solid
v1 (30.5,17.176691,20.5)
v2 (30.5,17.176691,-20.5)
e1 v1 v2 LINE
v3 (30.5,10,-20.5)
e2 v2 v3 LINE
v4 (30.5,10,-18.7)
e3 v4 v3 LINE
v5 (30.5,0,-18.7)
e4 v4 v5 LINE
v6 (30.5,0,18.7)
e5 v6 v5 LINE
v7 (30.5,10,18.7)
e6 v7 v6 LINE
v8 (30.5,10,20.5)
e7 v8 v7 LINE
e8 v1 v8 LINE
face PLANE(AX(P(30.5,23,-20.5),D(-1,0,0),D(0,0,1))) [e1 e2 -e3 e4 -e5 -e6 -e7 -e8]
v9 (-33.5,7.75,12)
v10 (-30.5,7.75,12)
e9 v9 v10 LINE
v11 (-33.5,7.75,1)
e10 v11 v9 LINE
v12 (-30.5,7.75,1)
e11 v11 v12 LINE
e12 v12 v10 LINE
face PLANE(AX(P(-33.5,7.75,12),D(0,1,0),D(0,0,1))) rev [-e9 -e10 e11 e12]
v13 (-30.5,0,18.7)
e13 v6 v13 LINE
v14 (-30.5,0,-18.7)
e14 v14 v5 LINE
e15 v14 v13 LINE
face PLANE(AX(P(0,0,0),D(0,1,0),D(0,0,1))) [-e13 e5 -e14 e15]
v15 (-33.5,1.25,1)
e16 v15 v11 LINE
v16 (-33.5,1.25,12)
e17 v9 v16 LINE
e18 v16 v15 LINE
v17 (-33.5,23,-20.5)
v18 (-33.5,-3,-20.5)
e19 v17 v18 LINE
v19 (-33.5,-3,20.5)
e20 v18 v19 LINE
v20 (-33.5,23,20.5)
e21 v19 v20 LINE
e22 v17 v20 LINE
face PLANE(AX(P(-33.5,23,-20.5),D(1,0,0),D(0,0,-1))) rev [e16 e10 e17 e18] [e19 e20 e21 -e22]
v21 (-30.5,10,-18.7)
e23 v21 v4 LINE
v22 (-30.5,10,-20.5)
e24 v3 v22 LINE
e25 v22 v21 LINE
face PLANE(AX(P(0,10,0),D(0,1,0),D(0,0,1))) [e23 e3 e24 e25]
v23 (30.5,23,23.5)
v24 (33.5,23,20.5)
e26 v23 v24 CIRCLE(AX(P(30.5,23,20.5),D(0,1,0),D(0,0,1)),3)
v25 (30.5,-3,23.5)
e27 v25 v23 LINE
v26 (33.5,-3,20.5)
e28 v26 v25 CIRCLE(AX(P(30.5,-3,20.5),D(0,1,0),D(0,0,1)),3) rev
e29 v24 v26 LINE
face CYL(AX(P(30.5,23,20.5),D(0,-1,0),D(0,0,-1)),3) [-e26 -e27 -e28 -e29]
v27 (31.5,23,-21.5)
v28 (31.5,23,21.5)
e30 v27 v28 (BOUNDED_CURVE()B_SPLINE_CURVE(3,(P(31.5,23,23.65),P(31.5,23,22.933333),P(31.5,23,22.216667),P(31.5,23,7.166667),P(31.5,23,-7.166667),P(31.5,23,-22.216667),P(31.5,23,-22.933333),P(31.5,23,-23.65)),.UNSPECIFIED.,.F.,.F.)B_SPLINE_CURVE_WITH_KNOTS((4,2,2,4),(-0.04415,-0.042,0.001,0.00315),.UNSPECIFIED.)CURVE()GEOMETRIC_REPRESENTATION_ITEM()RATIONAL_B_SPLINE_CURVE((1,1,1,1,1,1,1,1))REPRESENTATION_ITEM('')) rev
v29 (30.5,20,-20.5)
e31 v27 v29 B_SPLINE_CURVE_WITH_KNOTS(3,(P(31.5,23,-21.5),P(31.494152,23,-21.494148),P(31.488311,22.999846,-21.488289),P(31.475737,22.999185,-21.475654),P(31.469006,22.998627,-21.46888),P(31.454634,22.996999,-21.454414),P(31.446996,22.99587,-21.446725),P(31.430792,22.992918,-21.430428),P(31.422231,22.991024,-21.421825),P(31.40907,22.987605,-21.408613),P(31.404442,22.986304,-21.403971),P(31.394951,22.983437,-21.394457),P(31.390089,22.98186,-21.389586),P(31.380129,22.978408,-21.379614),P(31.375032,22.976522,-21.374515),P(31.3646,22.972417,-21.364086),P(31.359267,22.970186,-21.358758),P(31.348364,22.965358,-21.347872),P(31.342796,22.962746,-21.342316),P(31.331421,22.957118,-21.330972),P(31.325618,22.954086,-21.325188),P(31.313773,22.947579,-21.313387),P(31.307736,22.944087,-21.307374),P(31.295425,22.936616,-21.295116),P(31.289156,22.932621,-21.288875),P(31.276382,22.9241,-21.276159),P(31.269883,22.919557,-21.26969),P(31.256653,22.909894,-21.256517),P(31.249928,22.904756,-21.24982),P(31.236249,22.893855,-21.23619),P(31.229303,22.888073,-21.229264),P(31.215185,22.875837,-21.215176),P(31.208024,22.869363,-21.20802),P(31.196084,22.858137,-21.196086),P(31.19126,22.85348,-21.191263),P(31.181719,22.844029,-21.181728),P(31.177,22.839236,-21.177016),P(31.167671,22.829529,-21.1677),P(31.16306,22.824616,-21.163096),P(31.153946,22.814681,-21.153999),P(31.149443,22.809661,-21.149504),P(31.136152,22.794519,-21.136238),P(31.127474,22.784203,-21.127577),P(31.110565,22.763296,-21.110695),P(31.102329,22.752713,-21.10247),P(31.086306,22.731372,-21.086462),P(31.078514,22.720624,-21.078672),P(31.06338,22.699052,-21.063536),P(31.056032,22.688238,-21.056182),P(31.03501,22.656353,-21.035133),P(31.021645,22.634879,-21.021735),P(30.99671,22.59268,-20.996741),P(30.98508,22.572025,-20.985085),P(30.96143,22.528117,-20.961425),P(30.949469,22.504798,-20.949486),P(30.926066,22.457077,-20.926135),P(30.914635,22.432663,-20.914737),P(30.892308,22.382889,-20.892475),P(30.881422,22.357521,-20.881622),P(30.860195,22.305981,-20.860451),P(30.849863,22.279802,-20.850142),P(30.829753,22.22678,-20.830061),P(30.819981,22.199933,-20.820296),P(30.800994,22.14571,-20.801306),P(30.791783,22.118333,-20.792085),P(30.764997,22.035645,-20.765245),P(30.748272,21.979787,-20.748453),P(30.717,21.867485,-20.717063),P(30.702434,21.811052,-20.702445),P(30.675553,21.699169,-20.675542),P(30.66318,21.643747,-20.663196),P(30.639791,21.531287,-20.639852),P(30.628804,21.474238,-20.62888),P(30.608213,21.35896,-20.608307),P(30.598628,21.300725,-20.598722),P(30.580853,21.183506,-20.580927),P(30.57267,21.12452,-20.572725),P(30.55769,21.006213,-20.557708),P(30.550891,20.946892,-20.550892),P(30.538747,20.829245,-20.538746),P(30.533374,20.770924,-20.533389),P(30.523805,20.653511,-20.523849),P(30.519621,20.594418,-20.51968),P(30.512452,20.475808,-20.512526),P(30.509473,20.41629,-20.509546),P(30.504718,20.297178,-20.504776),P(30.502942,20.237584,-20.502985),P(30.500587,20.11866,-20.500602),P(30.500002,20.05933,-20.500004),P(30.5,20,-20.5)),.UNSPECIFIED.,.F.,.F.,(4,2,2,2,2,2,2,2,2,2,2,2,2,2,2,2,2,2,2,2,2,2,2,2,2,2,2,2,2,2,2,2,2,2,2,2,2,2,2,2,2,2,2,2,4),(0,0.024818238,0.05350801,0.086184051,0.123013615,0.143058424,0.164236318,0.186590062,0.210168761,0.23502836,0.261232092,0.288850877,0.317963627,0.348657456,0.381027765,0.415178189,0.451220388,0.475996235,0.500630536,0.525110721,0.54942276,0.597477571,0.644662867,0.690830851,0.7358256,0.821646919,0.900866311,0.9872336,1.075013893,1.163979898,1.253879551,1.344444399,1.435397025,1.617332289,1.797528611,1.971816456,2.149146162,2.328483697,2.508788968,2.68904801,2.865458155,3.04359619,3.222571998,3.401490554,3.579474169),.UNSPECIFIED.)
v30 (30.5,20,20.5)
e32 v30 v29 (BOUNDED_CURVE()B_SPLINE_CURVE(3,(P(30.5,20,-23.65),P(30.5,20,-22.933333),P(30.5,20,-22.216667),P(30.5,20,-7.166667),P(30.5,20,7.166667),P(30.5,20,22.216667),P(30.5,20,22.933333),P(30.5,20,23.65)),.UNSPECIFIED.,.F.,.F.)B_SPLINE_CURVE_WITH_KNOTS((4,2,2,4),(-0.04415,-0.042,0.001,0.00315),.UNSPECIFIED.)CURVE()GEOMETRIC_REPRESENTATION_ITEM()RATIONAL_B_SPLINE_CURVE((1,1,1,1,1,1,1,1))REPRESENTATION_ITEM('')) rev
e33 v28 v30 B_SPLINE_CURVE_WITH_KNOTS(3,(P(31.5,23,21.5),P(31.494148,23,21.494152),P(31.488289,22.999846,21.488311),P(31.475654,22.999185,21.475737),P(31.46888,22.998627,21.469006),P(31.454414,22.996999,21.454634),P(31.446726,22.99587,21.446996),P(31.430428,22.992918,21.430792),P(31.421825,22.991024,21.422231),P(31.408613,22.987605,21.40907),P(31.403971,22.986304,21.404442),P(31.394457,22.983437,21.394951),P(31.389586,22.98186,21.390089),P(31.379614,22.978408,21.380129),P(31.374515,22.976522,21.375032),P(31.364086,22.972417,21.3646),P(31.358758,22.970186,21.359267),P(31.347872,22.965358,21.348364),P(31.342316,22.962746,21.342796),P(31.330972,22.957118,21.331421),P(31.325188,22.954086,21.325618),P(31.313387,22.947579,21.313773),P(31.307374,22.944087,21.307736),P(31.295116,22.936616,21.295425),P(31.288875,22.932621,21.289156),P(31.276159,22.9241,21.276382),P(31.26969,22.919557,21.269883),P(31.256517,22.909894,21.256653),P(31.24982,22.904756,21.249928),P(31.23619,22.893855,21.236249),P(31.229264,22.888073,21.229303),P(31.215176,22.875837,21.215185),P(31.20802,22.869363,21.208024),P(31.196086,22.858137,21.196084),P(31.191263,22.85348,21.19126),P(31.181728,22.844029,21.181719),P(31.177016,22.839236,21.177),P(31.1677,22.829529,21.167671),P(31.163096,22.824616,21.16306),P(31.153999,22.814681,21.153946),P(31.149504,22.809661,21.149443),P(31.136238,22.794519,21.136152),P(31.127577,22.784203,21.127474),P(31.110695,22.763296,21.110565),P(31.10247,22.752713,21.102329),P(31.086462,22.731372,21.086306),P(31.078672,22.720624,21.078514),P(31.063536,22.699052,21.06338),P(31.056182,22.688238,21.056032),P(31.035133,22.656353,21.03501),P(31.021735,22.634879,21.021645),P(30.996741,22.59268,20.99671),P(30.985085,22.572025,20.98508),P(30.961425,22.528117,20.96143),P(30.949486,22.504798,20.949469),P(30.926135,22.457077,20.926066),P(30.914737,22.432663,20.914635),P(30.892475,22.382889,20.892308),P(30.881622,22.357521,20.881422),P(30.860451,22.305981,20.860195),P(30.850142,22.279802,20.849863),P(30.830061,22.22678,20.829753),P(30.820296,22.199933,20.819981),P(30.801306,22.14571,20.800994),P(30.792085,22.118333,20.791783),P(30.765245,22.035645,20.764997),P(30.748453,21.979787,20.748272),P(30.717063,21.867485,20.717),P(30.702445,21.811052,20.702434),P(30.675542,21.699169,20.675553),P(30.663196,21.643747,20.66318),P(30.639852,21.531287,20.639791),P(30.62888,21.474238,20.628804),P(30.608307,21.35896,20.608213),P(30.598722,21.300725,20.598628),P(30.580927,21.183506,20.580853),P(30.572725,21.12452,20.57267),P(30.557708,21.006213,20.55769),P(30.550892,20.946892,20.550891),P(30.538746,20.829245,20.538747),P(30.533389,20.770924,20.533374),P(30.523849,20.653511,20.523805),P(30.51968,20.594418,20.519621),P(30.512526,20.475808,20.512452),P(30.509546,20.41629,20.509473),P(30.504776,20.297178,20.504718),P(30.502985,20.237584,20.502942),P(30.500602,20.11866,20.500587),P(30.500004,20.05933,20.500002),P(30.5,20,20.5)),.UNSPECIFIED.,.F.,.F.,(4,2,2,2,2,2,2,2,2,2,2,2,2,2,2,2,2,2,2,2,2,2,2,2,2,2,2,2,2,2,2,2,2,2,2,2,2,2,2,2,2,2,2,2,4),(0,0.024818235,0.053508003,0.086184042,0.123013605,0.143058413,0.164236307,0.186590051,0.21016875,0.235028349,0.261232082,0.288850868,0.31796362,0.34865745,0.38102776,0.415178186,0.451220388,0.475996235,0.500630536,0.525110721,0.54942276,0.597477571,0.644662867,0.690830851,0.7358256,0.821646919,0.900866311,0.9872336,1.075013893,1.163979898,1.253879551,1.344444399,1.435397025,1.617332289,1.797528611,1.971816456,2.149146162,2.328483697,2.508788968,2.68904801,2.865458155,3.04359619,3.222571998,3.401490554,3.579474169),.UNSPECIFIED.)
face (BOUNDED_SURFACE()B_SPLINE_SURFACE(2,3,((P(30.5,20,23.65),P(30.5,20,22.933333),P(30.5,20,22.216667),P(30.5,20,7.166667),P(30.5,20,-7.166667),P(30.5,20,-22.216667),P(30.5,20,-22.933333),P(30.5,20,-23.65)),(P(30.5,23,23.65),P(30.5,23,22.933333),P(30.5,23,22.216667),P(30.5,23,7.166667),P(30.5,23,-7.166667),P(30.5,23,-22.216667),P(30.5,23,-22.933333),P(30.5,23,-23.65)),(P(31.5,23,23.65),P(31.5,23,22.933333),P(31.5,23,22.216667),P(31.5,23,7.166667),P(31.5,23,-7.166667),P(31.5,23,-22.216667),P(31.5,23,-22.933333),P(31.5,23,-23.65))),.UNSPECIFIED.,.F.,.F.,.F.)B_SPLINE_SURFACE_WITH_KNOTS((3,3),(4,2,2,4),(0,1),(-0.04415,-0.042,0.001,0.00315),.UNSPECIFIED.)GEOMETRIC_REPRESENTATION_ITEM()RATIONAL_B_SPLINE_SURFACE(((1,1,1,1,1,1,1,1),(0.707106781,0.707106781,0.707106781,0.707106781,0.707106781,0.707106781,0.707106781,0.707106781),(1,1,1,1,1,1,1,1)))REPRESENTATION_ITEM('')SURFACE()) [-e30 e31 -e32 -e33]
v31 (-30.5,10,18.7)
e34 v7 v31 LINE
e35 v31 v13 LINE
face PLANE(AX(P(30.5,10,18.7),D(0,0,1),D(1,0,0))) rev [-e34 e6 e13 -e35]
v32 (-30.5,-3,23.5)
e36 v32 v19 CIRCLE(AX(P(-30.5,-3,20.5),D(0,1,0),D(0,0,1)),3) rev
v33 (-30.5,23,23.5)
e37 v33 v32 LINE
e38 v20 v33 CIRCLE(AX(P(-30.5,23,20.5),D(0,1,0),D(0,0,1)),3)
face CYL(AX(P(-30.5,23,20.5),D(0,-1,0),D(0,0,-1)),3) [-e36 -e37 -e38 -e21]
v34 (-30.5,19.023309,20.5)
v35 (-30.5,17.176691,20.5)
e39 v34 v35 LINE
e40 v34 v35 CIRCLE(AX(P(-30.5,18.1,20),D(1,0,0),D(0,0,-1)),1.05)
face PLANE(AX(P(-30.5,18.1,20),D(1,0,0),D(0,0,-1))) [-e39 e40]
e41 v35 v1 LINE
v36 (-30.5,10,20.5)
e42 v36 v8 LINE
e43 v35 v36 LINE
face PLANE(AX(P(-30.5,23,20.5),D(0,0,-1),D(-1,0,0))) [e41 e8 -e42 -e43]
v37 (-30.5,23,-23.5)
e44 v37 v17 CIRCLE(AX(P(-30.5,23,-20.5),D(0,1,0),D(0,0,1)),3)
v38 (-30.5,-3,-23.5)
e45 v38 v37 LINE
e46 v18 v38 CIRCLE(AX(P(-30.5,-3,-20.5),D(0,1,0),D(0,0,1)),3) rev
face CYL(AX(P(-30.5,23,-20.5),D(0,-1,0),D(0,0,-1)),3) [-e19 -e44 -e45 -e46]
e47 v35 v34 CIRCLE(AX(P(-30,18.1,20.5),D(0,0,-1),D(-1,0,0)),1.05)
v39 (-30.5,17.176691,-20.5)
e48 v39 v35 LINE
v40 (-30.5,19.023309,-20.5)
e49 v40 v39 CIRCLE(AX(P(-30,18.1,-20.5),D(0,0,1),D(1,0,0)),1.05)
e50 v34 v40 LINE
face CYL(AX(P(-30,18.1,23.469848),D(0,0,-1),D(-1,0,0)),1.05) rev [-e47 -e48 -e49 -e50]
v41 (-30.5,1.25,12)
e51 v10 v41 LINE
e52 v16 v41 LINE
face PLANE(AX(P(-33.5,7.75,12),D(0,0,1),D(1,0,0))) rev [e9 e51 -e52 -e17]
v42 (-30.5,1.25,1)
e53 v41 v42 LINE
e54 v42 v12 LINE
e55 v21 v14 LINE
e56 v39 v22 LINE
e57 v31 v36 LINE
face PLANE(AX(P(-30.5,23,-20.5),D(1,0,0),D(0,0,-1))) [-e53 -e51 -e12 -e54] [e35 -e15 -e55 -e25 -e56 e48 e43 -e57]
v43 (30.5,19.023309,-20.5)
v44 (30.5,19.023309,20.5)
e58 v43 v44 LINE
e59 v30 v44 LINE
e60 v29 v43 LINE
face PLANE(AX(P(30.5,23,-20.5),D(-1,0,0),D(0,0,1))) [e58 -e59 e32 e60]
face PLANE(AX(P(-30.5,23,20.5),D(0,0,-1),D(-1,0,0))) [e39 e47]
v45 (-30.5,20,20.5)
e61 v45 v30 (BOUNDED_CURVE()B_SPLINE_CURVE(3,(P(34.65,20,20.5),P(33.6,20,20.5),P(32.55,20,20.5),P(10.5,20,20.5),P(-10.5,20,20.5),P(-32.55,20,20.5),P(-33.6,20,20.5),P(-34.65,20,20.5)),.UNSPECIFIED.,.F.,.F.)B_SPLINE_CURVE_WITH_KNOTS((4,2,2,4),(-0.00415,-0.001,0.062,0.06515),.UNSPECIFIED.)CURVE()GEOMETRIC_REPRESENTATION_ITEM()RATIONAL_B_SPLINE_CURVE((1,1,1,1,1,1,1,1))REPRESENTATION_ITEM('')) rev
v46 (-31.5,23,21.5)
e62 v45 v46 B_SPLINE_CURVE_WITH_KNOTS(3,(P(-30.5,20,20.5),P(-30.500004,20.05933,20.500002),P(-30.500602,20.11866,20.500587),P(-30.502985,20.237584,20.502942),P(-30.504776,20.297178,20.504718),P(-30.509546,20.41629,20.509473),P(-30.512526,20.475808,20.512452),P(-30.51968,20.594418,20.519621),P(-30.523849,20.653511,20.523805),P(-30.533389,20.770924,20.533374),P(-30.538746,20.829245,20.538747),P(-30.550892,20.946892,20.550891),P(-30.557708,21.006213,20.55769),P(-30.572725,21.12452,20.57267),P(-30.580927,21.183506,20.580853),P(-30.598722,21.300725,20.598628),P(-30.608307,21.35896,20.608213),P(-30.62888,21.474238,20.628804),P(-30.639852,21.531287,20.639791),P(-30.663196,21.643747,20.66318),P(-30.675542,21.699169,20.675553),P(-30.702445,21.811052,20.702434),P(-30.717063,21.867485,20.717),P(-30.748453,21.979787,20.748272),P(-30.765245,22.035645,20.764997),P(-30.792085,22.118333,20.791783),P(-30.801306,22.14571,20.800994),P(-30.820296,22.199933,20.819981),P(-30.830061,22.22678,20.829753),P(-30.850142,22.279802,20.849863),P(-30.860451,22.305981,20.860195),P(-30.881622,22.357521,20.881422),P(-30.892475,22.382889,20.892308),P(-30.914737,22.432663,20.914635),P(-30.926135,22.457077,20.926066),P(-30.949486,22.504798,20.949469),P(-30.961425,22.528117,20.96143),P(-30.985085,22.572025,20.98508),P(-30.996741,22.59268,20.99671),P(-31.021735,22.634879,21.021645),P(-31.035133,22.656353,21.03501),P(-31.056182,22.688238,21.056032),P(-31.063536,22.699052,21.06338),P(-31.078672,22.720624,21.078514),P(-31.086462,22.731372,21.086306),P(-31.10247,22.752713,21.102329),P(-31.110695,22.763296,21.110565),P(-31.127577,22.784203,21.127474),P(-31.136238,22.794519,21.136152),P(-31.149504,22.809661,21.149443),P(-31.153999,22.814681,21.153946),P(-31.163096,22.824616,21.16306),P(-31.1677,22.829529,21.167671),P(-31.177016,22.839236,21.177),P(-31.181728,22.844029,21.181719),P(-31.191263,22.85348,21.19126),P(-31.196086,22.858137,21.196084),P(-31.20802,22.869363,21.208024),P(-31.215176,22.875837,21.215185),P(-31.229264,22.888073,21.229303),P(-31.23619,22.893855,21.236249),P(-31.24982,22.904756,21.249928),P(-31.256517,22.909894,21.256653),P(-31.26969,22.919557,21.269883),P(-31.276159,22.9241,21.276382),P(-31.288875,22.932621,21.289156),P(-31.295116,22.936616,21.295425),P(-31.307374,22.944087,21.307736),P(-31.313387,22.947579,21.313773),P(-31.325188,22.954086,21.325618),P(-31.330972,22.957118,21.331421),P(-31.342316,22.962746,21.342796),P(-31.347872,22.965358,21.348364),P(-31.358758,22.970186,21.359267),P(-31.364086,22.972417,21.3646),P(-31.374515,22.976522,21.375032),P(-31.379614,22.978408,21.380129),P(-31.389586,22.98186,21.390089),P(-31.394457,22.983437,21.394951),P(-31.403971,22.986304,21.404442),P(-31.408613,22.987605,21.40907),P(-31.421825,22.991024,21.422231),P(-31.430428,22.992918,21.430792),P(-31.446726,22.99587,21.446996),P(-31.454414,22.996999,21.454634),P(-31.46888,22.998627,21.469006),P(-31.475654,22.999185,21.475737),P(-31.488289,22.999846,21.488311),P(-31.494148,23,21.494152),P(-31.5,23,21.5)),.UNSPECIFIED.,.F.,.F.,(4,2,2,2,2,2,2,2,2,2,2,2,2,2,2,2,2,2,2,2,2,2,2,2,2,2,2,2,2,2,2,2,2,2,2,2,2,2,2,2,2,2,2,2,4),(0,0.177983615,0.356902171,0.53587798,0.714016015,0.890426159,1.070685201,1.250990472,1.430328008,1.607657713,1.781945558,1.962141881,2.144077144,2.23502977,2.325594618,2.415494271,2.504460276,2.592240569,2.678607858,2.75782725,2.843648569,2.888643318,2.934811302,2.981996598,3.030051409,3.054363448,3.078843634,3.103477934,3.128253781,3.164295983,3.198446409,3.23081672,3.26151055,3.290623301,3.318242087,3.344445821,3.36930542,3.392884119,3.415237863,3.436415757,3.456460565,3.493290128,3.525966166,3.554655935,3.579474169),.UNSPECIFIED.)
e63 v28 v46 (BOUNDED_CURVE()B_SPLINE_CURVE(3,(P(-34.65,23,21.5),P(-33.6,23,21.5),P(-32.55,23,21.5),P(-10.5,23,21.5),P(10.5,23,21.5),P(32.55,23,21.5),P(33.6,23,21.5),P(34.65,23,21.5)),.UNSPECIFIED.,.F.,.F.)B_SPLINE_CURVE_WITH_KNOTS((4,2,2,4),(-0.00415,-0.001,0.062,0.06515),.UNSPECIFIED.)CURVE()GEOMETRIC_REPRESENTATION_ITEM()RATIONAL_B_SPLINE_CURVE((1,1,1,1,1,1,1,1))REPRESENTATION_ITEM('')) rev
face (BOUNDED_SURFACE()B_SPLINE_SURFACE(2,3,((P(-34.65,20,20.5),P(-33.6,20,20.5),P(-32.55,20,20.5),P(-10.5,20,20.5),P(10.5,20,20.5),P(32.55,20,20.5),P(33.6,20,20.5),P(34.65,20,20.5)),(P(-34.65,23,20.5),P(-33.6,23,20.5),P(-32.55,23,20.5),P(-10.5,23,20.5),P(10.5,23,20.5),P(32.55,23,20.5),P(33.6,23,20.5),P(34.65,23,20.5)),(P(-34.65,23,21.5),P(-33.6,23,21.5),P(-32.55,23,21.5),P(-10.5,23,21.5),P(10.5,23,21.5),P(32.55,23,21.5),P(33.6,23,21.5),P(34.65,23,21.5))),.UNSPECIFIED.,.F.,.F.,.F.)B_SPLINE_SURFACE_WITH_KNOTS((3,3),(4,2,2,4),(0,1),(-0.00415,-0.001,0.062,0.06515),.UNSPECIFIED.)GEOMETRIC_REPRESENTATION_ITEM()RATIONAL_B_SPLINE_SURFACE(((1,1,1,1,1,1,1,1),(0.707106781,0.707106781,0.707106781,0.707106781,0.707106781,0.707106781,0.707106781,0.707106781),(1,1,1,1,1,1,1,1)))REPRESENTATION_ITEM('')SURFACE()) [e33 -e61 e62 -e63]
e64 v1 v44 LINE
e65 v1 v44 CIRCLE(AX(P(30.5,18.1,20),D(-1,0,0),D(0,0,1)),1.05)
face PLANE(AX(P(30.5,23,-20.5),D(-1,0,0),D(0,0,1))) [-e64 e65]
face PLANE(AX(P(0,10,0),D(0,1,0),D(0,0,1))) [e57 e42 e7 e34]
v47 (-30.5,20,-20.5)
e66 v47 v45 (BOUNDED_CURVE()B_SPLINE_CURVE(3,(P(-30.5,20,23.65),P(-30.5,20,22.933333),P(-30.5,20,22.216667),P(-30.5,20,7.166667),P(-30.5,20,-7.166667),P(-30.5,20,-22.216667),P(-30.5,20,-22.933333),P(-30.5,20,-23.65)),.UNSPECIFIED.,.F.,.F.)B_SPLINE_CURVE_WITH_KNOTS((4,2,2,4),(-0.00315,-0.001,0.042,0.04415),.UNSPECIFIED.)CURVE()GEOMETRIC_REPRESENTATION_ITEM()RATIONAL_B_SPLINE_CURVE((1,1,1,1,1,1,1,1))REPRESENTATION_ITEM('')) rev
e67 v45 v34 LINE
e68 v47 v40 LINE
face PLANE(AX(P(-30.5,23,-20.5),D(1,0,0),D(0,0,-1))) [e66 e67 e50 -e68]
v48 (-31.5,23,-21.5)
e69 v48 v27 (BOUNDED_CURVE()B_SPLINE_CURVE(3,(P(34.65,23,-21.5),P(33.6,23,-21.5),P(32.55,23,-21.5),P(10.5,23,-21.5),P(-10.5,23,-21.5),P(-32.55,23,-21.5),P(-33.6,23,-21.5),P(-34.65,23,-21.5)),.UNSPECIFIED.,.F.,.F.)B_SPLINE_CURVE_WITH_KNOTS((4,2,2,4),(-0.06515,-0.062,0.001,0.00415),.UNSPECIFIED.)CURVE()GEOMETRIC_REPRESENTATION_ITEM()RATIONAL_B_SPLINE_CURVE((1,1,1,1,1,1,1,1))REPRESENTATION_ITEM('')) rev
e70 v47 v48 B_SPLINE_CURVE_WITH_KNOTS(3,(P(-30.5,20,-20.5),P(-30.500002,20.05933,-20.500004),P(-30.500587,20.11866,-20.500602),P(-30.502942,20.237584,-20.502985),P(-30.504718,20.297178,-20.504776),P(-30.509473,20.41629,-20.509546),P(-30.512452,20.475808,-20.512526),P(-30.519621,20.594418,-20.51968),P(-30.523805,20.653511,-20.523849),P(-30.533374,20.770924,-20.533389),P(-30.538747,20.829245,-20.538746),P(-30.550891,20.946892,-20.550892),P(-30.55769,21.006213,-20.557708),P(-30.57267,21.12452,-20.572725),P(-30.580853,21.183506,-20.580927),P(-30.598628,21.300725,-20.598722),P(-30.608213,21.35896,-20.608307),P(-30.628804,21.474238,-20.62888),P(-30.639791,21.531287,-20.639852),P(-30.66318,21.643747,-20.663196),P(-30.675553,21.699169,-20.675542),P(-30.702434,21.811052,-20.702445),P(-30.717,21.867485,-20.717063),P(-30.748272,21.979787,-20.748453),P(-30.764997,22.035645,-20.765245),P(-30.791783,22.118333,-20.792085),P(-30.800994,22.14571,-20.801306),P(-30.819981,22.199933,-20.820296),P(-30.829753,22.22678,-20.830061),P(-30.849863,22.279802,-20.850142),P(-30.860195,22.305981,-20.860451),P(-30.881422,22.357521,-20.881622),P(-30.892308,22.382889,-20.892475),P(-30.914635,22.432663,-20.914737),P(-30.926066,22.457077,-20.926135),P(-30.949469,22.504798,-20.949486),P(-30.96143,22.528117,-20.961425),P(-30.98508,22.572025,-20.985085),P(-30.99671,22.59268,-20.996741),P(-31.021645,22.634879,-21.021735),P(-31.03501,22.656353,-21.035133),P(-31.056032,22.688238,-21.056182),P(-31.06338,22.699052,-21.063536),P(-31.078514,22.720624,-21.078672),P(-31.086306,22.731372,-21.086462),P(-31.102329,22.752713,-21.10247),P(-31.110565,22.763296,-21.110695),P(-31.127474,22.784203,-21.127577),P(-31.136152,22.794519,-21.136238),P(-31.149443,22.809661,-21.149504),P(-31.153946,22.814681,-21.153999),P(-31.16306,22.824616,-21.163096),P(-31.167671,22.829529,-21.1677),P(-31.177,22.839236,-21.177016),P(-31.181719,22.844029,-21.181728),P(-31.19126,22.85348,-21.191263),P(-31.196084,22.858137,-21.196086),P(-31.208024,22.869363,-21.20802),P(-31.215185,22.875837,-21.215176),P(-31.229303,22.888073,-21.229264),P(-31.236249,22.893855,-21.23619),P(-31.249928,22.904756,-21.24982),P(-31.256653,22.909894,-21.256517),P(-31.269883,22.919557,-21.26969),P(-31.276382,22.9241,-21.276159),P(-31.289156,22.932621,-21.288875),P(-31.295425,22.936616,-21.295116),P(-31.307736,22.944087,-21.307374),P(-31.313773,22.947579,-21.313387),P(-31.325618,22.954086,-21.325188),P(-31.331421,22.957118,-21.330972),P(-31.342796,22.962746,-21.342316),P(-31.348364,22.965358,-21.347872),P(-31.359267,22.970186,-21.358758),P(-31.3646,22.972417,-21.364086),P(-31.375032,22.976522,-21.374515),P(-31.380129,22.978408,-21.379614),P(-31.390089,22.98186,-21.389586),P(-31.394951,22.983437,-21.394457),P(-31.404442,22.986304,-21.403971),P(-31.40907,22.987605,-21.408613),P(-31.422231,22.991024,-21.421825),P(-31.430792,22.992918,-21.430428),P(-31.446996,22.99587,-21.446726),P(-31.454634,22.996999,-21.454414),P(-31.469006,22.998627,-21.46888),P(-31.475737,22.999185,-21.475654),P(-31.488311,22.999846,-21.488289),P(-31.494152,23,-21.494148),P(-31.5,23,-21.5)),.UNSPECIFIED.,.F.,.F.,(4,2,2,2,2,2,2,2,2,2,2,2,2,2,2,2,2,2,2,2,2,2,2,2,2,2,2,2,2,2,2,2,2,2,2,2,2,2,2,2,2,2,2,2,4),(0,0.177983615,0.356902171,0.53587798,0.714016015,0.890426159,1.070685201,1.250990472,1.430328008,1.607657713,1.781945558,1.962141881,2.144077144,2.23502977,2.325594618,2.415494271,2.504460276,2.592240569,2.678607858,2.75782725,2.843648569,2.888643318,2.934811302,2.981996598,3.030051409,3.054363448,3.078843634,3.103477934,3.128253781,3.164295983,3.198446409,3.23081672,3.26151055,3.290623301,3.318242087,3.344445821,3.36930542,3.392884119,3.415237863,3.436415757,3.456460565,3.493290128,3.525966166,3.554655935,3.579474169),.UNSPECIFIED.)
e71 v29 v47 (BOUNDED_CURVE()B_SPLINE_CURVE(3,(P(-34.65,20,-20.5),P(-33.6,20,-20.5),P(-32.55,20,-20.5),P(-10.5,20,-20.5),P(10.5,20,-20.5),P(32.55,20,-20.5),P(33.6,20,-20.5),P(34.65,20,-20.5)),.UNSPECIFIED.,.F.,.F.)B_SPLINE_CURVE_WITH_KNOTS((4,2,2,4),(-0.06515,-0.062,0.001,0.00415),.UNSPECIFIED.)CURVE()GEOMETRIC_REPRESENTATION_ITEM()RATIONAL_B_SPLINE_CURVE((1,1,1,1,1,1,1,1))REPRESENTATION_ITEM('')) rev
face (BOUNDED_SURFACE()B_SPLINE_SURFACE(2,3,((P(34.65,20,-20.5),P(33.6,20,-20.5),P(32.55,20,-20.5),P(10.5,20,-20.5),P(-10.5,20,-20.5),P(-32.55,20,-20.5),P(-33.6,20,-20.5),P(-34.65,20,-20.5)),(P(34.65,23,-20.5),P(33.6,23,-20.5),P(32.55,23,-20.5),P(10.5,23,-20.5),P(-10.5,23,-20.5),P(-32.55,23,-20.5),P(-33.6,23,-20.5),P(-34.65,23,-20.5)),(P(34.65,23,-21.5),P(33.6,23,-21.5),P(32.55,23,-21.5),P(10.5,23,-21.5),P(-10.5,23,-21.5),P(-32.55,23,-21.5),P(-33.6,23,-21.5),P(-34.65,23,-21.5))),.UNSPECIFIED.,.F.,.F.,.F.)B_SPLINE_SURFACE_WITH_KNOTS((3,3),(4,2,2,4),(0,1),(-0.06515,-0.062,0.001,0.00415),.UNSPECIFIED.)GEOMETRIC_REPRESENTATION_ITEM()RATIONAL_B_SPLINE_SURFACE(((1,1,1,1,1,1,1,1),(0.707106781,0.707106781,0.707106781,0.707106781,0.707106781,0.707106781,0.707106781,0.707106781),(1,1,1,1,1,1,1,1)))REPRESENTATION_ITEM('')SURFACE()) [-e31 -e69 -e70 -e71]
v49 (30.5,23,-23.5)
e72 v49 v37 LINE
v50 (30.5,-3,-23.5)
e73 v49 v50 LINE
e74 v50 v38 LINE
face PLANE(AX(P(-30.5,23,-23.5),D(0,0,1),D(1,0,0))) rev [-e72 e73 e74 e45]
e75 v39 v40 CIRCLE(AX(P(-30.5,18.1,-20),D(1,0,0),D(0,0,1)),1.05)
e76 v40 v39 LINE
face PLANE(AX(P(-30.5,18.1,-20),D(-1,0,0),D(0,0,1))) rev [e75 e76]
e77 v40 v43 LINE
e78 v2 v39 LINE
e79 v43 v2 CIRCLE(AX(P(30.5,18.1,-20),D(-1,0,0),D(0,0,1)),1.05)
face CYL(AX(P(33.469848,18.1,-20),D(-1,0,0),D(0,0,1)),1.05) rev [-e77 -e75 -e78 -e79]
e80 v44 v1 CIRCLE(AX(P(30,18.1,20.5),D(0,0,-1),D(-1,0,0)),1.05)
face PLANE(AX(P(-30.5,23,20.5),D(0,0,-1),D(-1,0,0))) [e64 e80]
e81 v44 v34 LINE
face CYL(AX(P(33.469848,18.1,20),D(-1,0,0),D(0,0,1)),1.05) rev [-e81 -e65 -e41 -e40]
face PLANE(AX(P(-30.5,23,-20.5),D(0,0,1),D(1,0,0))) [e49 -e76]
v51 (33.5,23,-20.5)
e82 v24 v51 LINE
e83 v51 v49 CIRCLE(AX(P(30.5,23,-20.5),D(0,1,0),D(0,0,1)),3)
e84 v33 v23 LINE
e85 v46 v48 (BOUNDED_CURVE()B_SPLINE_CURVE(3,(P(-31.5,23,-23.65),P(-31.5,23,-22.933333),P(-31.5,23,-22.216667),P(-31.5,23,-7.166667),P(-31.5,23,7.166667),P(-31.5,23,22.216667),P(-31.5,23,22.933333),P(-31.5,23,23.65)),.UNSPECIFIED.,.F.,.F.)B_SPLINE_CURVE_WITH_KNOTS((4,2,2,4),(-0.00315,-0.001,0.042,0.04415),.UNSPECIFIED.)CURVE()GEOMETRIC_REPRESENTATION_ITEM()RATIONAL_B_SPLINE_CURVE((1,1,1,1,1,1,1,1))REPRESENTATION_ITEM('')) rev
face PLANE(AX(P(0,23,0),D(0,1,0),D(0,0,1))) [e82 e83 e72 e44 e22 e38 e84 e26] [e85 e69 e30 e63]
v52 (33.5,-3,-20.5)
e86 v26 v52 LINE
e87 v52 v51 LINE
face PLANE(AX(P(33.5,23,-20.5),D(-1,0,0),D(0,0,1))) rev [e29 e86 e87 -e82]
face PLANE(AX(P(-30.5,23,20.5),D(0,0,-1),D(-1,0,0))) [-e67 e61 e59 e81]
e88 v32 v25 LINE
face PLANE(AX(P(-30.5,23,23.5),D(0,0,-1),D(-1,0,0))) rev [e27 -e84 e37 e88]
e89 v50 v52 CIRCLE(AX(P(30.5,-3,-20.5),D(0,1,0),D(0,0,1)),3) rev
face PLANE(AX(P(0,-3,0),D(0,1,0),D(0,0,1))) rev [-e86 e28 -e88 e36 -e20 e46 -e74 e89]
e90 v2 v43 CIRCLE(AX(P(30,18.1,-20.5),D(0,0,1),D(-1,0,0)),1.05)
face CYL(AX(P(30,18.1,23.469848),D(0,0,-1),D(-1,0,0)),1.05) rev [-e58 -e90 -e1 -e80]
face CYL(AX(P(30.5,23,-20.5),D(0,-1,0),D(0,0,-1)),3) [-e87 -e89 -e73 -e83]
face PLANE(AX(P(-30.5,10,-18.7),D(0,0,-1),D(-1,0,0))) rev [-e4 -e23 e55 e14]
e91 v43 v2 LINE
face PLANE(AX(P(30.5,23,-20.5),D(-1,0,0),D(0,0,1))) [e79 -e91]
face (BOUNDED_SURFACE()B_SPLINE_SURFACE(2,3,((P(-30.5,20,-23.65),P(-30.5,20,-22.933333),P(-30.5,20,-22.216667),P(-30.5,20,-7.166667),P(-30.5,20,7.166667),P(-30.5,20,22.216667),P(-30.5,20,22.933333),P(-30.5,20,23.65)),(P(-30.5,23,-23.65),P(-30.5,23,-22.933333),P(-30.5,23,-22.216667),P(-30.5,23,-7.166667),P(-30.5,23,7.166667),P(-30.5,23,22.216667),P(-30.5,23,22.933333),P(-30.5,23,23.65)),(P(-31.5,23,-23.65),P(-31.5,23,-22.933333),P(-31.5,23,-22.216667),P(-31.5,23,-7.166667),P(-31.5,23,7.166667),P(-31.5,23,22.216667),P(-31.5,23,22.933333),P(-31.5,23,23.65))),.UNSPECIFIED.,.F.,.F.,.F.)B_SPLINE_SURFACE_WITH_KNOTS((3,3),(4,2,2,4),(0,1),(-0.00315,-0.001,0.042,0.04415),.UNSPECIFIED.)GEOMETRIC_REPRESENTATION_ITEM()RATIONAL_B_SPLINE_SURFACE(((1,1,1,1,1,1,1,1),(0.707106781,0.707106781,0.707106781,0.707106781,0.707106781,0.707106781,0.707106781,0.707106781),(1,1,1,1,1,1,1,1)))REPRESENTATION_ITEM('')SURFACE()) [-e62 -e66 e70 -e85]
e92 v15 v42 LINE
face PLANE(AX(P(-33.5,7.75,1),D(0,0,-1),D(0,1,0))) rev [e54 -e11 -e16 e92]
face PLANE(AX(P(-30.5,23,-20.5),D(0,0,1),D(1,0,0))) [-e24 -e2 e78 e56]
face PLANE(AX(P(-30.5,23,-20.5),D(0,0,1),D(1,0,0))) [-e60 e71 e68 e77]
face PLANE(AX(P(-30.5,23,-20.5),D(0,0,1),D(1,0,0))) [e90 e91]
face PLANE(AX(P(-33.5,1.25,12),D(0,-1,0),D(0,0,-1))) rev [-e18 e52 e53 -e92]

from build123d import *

# Parameters (mm, degrees)
SKETCH1_W           = 61
SKETCH1_H           = 41
BOSS_EXTRUDE1_DEPTH = 23
SHELL1_T            = 3
SKETCH2_W           = 11
SKETCH2_H           = 6.5
CUT_EXTRUDE1_DEPTH  = 72.953109731
SKETCH3_W           = 61
SKETCH3_H           = 1.8
BOSS_EXTRUDE2_DEPTH = 10
SKETCH4_R           = 1.05
CUT_EXTRUDE2_DEPTH  = 41
SKETCH5_R           = 1.05
CUT_EXTRUDE3_DEPTH  = 61
FILLET1_SIZE        = 1
FILLET1_SIZE_2      = 3
FILLET2_R           = 3


with BuildPart() as part:
    # Sketch1 → Boss-Extrude1 (new body)
    with BuildSketch(Plane(origin=(0, 0, 0), x_dir=(1, 0, 0), z_dir=(0, 1, 0))):
        Rectangle(SKETCH1_W, SKETCH1_H)
    extrude(amount=BOSS_EXTRUDE1_DEPTH)

    # Shell1
    shell1_openings = [part.faces().sort_by_distance(p)[0] for p in [
        (0, 23, 0),
    ]]
    offset(amount=SHELL1_T, openings=shell1_openings, kind=Kind.INTERSECTION)

    # Sketch2 → Cut-Extrude1 (cut, through all)
    with BuildSketch(Plane(origin=(-30.5, 0, 0), x_dir=(0, 0, -1), z_dir=(1, 0, 0))):
        with Locations((-6.5, 4.5)):
            Rectangle(SKETCH2_W, SKETCH2_H)
    extrude(amount=-CUT_EXTRUDE1_DEPTH, mode=Mode.SUBTRACT)

    # Sketch3 → Boss-Extrude2 (add)
    with BuildSketch(Plane(origin=(0, 0, 0), x_dir=(1, 0, 0), z_dir=(0, 1, 0))):
        with Locations((0, 19.6)):
            Rectangle(SKETCH3_W, SKETCH3_H)
        with Locations((0, -19.6)):
            Rectangle(SKETCH3_W, SKETCH3_H)
    extrude(amount=BOSS_EXTRUDE2_DEPTH)

    # Sketch4 → Cut-Extrude2 (cut)
    with BuildSketch(Plane.XY.offset(-20.5)):
        with Locations((-30, 18.1)):
            Circle(SKETCH4_R)
        with Locations((30, 18.1)):
            Circle(SKETCH4_R)
    extrude(amount=CUT_EXTRUDE2_DEPTH, mode=Mode.SUBTRACT)

    # Sketch5 → Cut-Extrude3 (cut)
    with BuildSketch(Plane(origin=(-30.5, 0, 0), x_dir=(0, 0, -1), z_dir=(1, 0, 0))):
        with Locations((-20, 18.1)):
            Circle(SKETCH5_R)
        with Locations((20, 18.1)):
            Circle(SKETCH5_R)
    extrude(amount=CUT_EXTRUDE3_DEPTH, mode=Mode.SUBTRACT)

    # Fillet1
    # an asymmetric fillet: 3, 1 mm, written as the material it takes off along each edge
    with BuildSketch(Plane(origin=(30.5, 23, 20.5), x_dir=(0, 0, 1), z_dir=(-1, 0, 0)), Plane(origin=(-30.5, 23, -20.5), x_dir=(0, 0, -1), z_dir=(1, 0, 0))) as fillet1_piece_1:
        with BuildLine():
            Bezier((FILLET1_SIZE, 0), (0, 0), (0, -FILLET1_SIZE_2), weights=[1, 0.707106781, 1])
            Line((0, -FILLET1_SIZE_2), (-0.06, -3))
            Line((-0.06, -3), (-0.06, 0.06))
            Line((-0.06, 0.06), (1, 0.06))
            Line((1, 0.06), (FILLET1_SIZE, 0))
        make_face()
    extrude(amount=61, mode=Mode.SUBTRACT)
    with BuildSketch(Plane(origin=(30.5, 23, -20.5), x_dir=(1, 0, 0), z_dir=(0, 0, 1)), Plane(origin=(-30.5, 23, 20.5), x_dir=(-1, 0, 0), z_dir=(0, 0, -1))) as fillet1_piece_2:
        with BuildLine():
            Bezier((FILLET1_SIZE, 0), (0, 0), (0, -FILLET1_SIZE_2), weights=[1, 0.707106781, 1])
            Line((0, -FILLET1_SIZE_2), (-0.06, -3))
            Line((-0.06, -3), (-0.06, 0.06))
            Line((-0.06, 0.06), (1, 0.06))
            Line((1, 0.06), (FILLET1_SIZE, 0))
        make_face()
    extrude(amount=41, mode=Mode.SUBTRACT)
    with BuildSketch(Plane(origin=(38, 23, 20.5), x_dir=(0, 0, 1), z_dir=(-1, 0, 0))) as fillet1_piece_3a_section:
        with BuildLine():
            Bezier((FILLET1_SIZE, 0), (0, 0), (0, -FILLET1_SIZE_2), weights=[1, 0.707106781, 1])
            Line((0, -FILLET1_SIZE_2), (-0.06, -3))
            Line((-0.06, -3), (-0.06, 0.06))
            Line((-0.06, 0.06), (1, 0.06))
            Line((1, 0.06), (FILLET1_SIZE, 0))
        make_face()
    fillet1_piece_3a = extrude(amount=68.5, mode=Mode.PRIVATE)
    fillet1_piece_3a = split(fillet1_piece_3a, bisect_by=Plane(origin=(30.5, 22.211737764, 20.689651293), z_dir=(1, 0, 0)), keep=Keep.TOP, mode=Mode.PRIVATE)
    with BuildSketch(Plane(origin=(30.5, 23, -20.5), x_dir=(1, 0, 0), z_dir=(0, 0, 1))) as fillet1_piece_3b_section:
        with BuildLine():
            Bezier((FILLET1_SIZE, 0), (0, 0), (0, -FILLET1_SIZE_2), weights=[1, 0.707106781, 1])
            Line((0, -FILLET1_SIZE_2), (-0.06, -3))
            Line((-0.06, -3), (-0.06, 0.06))
            Line((-0.06, 0.06), (1, 0.06))
            Line((1, 0.06), (FILLET1_SIZE, 0))
        make_face()
    fillet1_piece_3b = extrude(amount=48.5, mode=Mode.PRIVATE)
    fillet1_piece_3b = split(fillet1_piece_3b, bisect_by=Plane(origin=(30.689651156, 22.211737177, 20.5), z_dir=(0, 0, 1)), keep=Keep.TOP, mode=Mode.PRIVATE)
    fillet1_piece_3 = fillet1_piece_3a & fillet1_piece_3b
    add(fillet1_piece_3, mode=Mode.SUBTRACT)
    with BuildSketch(Plane(origin=(-30.5, 23, 28), x_dir=(-1, 0, 0), z_dir=(0, 0, -1))) as fillet1_piece_4a_section:
        with BuildLine():
            Bezier((FILLET1_SIZE, 0), (0, 0), (0, -FILLET1_SIZE_2), weights=[1, 0.707106781, 1])
            Line((0, -FILLET1_SIZE_2), (-0.06, -3))
            Line((-0.06, -3), (-0.06, 0.06))
            Line((-0.06, 0.06), (1, 0.06))
            Line((1, 0.06), (FILLET1_SIZE, 0))
        make_face()
    fillet1_piece_4a = extrude(amount=48.5, mode=Mode.PRIVATE)
    fillet1_piece_4a = split(fillet1_piece_4a, bisect_by=Plane(origin=(-30.689651293, 22.211737761, 20.5), z_dir=(0, 0, 1)), keep=Keep.TOP, mode=Mode.PRIVATE)
    with BuildSketch(Plane(origin=(30.5, 23, 20.5), x_dir=(0, 0, 1), z_dir=(-1, 0, 0))) as fillet1_piece_4b_section:
        with BuildLine():
            Bezier((FILLET1_SIZE, 0), (0, 0), (0, -FILLET1_SIZE_2), weights=[1, 0.707106781, 1])
            Line((0, -FILLET1_SIZE_2), (-0.06, -3))
            Line((-0.06, -3), (-0.06, 0.06))
            Line((-0.06, 0.06), (1, 0.06))
            Line((1, 0.06), (FILLET1_SIZE, 0))
        make_face()
    fillet1_piece_4b = extrude(amount=68.5, mode=Mode.PRIVATE)
    fillet1_piece_4b = split(fillet1_piece_4b, bisect_by=Plane(origin=(-30.5, 22.211737179, 20.689651156), z_dir=(-1, 0, 0)), keep=Keep.TOP, mode=Mode.PRIVATE)
    fillet1_piece_4 = fillet1_piece_4a & fillet1_piece_4b
    add(fillet1_piece_4, mode=Mode.SUBTRACT)
    with BuildSketch(Plane(origin=(-30.5, 23, -20.5), x_dir=(0, 0, -1), z_dir=(1, 0, 0))) as fillet1_piece_5a_section:
        with BuildLine():
            Bezier((FILLET1_SIZE, 0), (0, 0), (0, -FILLET1_SIZE_2), weights=[1, 0.707106781, 1])
            Line((0, -FILLET1_SIZE_2), (-0.06, -3))
            Line((-0.06, -3), (-0.06, 0.06))
            Line((-0.06, 0.06), (1, 0.06))
            Line((1, 0.06), (FILLET1_SIZE, 0))
        make_face()
    fillet1_piece_5a = extrude(amount=68.5, mode=Mode.PRIVATE)
    fillet1_piece_5a = split(fillet1_piece_5a, bisect_by=Plane(origin=(30.5, 22.211737179, -20.689651156), z_dir=(1, 0, 0)), keep=Keep.TOP, mode=Mode.PRIVATE)
    with BuildSketch(Plane(origin=(30.5, 23, -28), x_dir=(1, 0, 0), z_dir=(0, 0, 1))) as fillet1_piece_5b_section:
        with BuildLine():
            Bezier((FILLET1_SIZE, 0), (0, 0), (0, -FILLET1_SIZE_2), weights=[1, 0.707106781, 1])
            Line((0, -FILLET1_SIZE_2), (-0.06, -3))
            Line((-0.06, -3), (-0.06, 0.06))
            Line((-0.06, 0.06), (1, 0.06))
            Line((1, 0.06), (FILLET1_SIZE, 0))
        make_face()
    fillet1_piece_5b = extrude(amount=48.5, mode=Mode.PRIVATE)
    fillet1_piece_5b = split(fillet1_piece_5b, bisect_by=Plane(origin=(30.689651293, 22.211737761, -20.5), z_dir=(0, 0, -1)), keep=Keep.TOP, mode=Mode.PRIVATE)
    fillet1_piece_5 = fillet1_piece_5a & fillet1_piece_5b
    add(fillet1_piece_5, mode=Mode.SUBTRACT)
    with BuildSketch(Plane(origin=(-38, 23, -20.5), x_dir=(0, 0, -1), z_dir=(1, 0, 0))) as fillet1_piece_6a_section:
        with BuildLine():
            Bezier((FILLET1_SIZE, 0), (0, 0), (0, -FILLET1_SIZE_2), weights=[1, 0.707106781, 1])
            Line((0, -FILLET1_SIZE_2), (-0.06, -3))
            Line((-0.06, -3), (-0.06, 0.06))
            Line((-0.06, 0.06), (1, 0.06))
            Line((1, 0.06), (FILLET1_SIZE, 0))
        make_face()
    fillet1_piece_6a = extrude(amount=68.5, mode=Mode.PRIVATE)
    fillet1_piece_6a = split(fillet1_piece_6a, bisect_by=Plane(origin=(-30.5, 22.211737764, -20.689651293), z_dir=(-1, 0, 0)), keep=Keep.TOP, mode=Mode.PRIVATE)
    with BuildSketch(Plane(origin=(-30.5, 23, 20.5), x_dir=(-1, 0, 0), z_dir=(0, 0, -1))) as fillet1_piece_6b_section:
        with BuildLine():
            Bezier((FILLET1_SIZE, 0), (0, 0), (0, -FILLET1_SIZE_2), weights=[1, 0.707106781, 1])
            Line((0, -FILLET1_SIZE_2), (-0.06, -3))
            Line((-0.06, -3), (-0.06, 0.06))
            Line((-0.06, 0.06), (1, 0.06))
            Line((1, 0.06), (FILLET1_SIZE, 0))
        make_face()
    fillet1_piece_6b = extrude(amount=48.5, mode=Mode.PRIVATE)
    fillet1_piece_6b = split(fillet1_piece_6b, bisect_by=Plane(origin=(-30.689651156, 22.211737177, -20.5), z_dir=(0, 0, -1)), keep=Keep.TOP, mode=Mode.PRIVATE)
    fillet1_piece_6 = fillet1_piece_6a & fillet1_piece_6b
    add(fillet1_piece_6, mode=Mode.SUBTRACT)

    # Fillet2
    fillet2_edges = [part.edges().sort_by_distance(p)[0] for p in [
        (33.5, 10, 23.5),
        (-33.5, 10, 23.5),
        (-33.5, 10, -23.5),
        (33.5, 10, -23.5),
    ]]
    fillet(fillet2_edges, radius=FILLET2_R)


solid = part.part
